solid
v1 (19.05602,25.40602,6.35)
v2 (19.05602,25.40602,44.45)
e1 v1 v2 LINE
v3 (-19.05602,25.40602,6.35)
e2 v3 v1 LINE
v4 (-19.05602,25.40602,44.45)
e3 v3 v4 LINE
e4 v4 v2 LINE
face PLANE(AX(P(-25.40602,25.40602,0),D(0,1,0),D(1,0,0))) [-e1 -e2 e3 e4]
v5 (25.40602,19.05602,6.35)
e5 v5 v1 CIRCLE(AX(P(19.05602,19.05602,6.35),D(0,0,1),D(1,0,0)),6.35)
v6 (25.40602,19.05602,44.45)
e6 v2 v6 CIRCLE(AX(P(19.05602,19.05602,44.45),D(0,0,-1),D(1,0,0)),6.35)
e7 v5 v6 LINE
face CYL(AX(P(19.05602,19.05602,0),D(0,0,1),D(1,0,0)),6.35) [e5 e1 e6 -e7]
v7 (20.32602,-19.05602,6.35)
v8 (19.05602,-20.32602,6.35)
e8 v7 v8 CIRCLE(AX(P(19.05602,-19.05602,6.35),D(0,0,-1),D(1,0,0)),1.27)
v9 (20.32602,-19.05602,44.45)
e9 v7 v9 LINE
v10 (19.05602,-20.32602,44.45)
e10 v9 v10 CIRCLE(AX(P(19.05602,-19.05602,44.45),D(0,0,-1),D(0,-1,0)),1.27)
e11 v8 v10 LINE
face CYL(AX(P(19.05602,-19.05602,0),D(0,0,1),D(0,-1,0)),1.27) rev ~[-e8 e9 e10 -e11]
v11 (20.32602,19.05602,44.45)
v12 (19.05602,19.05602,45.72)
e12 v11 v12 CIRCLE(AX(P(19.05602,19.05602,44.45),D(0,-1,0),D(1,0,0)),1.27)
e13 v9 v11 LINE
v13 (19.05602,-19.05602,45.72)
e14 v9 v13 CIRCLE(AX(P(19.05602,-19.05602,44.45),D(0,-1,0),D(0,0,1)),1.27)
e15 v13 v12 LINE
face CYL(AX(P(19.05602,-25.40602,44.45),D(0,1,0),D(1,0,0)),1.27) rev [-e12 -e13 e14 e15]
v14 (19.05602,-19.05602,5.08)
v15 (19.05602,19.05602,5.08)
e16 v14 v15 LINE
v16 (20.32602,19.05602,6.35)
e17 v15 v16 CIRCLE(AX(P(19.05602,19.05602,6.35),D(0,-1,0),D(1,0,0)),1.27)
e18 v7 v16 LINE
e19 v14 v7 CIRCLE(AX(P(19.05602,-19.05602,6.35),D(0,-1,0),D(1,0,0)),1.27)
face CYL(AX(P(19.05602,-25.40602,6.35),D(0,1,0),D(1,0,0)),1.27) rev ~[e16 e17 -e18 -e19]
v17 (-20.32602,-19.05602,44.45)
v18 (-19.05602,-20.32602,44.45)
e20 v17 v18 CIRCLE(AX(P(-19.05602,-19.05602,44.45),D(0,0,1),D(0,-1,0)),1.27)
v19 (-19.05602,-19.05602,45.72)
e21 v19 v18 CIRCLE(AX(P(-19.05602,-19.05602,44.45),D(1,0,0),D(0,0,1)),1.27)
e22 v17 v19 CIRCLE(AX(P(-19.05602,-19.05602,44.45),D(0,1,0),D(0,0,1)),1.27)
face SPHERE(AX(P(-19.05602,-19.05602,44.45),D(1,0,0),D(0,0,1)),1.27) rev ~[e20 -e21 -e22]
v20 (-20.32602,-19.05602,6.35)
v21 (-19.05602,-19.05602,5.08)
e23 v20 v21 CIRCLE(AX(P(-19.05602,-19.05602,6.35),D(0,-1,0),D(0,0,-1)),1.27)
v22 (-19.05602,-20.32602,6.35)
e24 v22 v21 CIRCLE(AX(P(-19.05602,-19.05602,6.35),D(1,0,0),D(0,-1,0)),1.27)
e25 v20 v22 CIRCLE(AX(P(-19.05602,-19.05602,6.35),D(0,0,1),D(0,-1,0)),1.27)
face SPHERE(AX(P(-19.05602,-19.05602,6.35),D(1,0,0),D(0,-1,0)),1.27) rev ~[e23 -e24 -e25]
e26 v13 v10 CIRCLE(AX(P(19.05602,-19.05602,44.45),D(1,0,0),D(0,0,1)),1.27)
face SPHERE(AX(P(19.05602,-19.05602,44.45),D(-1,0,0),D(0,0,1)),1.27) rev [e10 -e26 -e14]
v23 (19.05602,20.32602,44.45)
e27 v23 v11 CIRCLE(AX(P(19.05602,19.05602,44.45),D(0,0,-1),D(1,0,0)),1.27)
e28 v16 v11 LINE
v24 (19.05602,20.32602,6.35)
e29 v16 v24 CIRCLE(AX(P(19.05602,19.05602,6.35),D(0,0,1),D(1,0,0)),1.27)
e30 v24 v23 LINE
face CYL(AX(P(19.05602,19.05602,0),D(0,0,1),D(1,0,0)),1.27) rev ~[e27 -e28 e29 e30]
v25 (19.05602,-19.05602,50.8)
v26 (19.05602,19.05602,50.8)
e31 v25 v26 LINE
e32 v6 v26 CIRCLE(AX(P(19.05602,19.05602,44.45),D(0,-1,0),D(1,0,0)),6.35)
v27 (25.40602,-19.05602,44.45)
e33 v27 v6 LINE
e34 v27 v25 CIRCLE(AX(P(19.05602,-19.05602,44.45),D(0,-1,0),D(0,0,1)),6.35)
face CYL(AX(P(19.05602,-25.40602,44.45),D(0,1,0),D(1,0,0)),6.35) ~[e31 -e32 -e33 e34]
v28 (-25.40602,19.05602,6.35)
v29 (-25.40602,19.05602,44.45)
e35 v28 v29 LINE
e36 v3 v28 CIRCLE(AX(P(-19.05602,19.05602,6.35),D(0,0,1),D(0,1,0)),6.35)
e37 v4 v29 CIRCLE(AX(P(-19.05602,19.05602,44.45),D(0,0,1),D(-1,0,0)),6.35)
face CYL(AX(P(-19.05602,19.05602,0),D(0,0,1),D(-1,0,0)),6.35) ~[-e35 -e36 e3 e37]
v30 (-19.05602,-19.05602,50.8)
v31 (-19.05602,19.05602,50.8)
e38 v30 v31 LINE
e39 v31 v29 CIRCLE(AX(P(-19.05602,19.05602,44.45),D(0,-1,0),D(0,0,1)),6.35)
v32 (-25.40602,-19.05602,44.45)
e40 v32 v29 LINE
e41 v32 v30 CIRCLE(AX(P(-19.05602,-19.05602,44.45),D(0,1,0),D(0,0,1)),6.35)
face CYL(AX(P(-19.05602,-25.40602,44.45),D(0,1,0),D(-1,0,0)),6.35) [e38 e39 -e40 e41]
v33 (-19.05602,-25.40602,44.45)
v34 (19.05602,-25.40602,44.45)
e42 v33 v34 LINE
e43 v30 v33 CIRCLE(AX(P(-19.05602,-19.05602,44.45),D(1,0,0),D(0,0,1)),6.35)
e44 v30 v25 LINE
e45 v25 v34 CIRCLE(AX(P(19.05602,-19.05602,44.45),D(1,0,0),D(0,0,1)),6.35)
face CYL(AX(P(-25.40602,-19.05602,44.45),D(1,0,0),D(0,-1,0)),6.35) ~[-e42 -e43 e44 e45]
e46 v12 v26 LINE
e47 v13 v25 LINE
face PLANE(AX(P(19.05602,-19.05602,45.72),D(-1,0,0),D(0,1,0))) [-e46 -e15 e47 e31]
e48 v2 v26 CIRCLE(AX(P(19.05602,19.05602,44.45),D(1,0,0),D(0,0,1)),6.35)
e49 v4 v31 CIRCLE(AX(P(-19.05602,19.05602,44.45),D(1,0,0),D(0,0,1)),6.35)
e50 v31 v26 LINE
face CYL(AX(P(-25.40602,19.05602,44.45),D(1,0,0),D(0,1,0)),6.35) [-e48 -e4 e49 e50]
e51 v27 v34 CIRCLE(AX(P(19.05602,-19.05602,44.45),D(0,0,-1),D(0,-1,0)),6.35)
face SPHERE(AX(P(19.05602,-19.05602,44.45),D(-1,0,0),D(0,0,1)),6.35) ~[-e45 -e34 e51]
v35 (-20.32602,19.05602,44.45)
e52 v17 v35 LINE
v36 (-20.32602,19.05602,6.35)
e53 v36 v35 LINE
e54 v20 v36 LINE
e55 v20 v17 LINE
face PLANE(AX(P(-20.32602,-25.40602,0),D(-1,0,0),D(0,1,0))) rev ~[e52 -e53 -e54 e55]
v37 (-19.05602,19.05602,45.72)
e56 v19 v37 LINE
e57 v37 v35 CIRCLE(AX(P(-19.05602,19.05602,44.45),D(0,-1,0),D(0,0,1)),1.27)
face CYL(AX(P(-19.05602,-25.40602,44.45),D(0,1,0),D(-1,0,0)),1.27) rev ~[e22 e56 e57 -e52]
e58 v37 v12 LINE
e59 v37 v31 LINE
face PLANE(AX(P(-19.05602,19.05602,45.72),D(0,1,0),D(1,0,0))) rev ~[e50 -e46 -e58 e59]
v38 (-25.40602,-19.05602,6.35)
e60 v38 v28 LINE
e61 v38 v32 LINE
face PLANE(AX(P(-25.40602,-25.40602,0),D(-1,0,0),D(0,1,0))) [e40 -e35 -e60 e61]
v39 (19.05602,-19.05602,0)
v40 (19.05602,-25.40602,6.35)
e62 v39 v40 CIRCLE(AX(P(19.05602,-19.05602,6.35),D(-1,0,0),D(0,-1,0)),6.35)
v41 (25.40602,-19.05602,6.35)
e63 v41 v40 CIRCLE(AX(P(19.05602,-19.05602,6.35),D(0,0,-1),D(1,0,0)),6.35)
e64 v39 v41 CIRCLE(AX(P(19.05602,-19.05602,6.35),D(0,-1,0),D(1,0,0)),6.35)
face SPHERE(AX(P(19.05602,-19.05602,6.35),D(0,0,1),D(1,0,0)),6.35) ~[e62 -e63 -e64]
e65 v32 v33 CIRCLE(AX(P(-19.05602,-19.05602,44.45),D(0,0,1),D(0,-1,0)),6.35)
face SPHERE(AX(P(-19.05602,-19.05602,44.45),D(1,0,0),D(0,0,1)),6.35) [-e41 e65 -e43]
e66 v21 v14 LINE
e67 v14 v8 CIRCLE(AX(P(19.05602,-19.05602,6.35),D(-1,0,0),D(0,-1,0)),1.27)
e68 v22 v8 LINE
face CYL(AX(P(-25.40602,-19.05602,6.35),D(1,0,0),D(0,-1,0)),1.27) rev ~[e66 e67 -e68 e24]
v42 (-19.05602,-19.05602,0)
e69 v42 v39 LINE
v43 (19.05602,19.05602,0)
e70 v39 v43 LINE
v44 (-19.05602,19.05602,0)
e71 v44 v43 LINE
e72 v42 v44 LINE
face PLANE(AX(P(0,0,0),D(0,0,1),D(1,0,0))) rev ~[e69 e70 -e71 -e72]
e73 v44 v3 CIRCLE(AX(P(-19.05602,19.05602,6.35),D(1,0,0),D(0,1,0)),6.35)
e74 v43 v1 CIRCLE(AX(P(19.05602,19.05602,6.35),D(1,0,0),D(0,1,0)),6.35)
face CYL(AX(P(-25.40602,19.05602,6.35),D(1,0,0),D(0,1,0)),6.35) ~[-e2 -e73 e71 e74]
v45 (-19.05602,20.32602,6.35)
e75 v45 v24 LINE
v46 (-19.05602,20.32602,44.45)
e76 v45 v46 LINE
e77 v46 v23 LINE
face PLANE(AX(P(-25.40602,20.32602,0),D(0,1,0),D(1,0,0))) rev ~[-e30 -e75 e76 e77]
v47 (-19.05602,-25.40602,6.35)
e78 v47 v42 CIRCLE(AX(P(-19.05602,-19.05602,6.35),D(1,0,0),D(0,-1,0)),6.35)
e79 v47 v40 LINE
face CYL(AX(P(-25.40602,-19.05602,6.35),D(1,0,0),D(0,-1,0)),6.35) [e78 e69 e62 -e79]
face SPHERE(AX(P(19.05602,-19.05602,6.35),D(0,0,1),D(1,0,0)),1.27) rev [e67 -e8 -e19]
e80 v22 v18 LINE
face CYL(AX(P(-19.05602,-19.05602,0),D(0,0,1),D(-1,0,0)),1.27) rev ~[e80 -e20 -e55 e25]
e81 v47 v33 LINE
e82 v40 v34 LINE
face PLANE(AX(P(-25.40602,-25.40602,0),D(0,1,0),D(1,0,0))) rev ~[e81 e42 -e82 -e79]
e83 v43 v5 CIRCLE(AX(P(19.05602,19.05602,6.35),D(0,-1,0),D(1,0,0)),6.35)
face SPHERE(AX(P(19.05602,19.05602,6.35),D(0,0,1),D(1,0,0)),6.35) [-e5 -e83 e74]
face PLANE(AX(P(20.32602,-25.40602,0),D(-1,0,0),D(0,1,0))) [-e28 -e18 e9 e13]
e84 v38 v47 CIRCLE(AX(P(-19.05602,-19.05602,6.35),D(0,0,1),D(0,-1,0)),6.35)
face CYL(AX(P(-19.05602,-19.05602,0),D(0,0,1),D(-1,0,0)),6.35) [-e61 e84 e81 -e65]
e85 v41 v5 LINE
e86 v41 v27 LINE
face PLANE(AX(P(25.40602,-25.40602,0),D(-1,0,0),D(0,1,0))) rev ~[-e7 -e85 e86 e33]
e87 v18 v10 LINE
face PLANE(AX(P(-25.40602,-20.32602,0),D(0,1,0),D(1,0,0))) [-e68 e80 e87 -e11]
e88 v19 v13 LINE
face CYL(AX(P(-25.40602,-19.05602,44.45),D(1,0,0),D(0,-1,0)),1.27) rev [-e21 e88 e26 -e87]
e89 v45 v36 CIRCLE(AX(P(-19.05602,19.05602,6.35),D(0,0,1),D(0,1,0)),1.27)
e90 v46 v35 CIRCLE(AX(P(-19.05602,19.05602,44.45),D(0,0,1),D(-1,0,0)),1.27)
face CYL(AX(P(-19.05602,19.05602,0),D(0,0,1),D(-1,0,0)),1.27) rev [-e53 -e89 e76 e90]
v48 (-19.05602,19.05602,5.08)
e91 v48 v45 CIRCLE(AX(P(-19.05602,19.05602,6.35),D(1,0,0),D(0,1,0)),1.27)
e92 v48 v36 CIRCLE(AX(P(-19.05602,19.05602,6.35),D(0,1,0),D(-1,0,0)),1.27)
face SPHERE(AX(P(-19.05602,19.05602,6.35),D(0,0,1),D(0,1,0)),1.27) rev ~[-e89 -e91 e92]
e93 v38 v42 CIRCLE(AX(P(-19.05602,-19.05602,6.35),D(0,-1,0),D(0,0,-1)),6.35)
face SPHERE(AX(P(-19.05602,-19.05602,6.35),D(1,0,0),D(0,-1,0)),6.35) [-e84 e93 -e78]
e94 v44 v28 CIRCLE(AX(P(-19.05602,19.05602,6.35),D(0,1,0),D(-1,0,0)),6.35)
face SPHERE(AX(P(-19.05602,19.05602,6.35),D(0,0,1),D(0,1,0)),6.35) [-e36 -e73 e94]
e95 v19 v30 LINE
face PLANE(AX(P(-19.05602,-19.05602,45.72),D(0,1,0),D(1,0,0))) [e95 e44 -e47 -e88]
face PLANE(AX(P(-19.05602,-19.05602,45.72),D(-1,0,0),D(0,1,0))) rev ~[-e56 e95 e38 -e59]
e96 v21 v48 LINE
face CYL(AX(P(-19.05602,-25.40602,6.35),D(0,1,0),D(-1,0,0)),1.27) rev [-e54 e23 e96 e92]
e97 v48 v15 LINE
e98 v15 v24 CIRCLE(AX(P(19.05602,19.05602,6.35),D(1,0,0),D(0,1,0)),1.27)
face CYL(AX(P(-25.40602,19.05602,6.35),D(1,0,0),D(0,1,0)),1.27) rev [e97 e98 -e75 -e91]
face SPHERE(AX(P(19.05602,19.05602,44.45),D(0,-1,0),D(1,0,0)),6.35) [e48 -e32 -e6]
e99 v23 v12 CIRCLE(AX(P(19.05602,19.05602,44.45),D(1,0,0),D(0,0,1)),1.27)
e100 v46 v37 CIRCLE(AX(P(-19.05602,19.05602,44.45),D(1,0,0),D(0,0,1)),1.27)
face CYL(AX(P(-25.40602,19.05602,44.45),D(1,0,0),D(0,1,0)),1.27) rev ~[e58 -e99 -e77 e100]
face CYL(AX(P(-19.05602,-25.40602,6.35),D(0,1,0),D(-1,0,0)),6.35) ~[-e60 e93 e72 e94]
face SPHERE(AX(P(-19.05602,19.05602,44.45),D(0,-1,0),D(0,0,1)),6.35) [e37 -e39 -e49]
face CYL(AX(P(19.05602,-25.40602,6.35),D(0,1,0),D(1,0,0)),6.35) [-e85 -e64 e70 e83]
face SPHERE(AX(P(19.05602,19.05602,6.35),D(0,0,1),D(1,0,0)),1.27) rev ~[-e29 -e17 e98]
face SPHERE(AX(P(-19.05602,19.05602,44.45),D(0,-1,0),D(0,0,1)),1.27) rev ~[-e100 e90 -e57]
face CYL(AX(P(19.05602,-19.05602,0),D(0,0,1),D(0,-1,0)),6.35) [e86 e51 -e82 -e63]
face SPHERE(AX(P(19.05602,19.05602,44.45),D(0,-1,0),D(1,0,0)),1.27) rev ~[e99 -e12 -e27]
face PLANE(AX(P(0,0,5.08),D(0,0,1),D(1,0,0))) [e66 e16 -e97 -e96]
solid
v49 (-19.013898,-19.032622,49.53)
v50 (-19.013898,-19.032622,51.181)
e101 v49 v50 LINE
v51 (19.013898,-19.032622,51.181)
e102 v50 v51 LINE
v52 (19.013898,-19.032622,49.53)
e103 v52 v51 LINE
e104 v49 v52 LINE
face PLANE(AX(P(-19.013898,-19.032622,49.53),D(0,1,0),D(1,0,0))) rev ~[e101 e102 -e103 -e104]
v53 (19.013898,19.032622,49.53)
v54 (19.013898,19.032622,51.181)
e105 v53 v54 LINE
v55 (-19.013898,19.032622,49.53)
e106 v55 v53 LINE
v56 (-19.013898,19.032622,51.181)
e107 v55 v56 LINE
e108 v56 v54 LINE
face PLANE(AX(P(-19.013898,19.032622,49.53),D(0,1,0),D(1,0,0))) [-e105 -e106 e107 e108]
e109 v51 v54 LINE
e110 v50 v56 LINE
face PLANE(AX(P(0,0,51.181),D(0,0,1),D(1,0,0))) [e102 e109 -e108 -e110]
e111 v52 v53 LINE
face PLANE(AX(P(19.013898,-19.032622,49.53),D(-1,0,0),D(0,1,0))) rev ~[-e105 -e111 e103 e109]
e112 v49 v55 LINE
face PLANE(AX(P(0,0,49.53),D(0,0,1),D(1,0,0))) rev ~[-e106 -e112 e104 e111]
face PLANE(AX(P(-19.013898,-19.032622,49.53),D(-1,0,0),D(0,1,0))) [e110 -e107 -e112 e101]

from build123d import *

# Parameters (mm, degrees)
F0_W     = 50.8120395243
F0_H     = 50.8120395243
F1_DEPTH = 50.8
F2_R     = 6.35
F3_T     = -5.08
F5_START = 49.53
F4_W     = 38.0277968943
F4_H     = 38.0652435124
F5_DEPTH = 1.651


# Not quite as in the source:
# - a shell that OpenCascade refuses in one call is made with other operations: the cavity is built on its own and cut out


with BuildPart() as f1:
    # F0 (on Top) → F1 (new body)
    with BuildSketch(Plane.XY):
        Rectangle(F0_W, F0_H)
    extrude(amount=F1_DEPTH)

    # F2
    f2_edges = [f1.edges().sort_by_distance(p)[0] for p in [
        (0, -25.40602, 50.8),
        (25.40602, 0, 50.8),
        (25.40602, -25.40602, 25.4),
        (25.40602, 25.40602, 25.4),
        (25.40602, 0, 0),
        (0, -25.40602, 0),
        (-25.40602, 0, 50.8),
        (0, 25.40602, 50.8),
        (-25.40602, -25.40602, 25.4),
        (-25.40602, 25.40602, 25.4),
        (0, 25.40602, 0),
        (-25.40602, 0, 0),
    ]]
    fillet(f2_edges, radius=F2_R)

    # F3: a shell. OpenCascade refuses it in one call, so the cavity is built on its own and cut out:
    # the body offset inwards by the wall thickness, plus a prism from it out through each open face.
    f3_core = offset(f1.part, amount=F3_T, mode=Mode.PRIVATE)
    f3_exits = [f3_core.faces().sort_by_distance(p)[0] for p in [
        (0, 0, 45.72),
    ]]
    add(f3_core, mode=Mode.SUBTRACT)
    extrude(f3_exits, amount=-F3_T, mode=Mode.SUBTRACT)


with BuildPart() as f5:
    # F4 (on Top) → F5 (new body)
    with BuildSketch(Plane.XY.offset(F5_START)):
        Rectangle(F4_W, F4_H)
    extrude(amount=F5_DEPTH)


solid = Compound([f1.part, f5.part])
